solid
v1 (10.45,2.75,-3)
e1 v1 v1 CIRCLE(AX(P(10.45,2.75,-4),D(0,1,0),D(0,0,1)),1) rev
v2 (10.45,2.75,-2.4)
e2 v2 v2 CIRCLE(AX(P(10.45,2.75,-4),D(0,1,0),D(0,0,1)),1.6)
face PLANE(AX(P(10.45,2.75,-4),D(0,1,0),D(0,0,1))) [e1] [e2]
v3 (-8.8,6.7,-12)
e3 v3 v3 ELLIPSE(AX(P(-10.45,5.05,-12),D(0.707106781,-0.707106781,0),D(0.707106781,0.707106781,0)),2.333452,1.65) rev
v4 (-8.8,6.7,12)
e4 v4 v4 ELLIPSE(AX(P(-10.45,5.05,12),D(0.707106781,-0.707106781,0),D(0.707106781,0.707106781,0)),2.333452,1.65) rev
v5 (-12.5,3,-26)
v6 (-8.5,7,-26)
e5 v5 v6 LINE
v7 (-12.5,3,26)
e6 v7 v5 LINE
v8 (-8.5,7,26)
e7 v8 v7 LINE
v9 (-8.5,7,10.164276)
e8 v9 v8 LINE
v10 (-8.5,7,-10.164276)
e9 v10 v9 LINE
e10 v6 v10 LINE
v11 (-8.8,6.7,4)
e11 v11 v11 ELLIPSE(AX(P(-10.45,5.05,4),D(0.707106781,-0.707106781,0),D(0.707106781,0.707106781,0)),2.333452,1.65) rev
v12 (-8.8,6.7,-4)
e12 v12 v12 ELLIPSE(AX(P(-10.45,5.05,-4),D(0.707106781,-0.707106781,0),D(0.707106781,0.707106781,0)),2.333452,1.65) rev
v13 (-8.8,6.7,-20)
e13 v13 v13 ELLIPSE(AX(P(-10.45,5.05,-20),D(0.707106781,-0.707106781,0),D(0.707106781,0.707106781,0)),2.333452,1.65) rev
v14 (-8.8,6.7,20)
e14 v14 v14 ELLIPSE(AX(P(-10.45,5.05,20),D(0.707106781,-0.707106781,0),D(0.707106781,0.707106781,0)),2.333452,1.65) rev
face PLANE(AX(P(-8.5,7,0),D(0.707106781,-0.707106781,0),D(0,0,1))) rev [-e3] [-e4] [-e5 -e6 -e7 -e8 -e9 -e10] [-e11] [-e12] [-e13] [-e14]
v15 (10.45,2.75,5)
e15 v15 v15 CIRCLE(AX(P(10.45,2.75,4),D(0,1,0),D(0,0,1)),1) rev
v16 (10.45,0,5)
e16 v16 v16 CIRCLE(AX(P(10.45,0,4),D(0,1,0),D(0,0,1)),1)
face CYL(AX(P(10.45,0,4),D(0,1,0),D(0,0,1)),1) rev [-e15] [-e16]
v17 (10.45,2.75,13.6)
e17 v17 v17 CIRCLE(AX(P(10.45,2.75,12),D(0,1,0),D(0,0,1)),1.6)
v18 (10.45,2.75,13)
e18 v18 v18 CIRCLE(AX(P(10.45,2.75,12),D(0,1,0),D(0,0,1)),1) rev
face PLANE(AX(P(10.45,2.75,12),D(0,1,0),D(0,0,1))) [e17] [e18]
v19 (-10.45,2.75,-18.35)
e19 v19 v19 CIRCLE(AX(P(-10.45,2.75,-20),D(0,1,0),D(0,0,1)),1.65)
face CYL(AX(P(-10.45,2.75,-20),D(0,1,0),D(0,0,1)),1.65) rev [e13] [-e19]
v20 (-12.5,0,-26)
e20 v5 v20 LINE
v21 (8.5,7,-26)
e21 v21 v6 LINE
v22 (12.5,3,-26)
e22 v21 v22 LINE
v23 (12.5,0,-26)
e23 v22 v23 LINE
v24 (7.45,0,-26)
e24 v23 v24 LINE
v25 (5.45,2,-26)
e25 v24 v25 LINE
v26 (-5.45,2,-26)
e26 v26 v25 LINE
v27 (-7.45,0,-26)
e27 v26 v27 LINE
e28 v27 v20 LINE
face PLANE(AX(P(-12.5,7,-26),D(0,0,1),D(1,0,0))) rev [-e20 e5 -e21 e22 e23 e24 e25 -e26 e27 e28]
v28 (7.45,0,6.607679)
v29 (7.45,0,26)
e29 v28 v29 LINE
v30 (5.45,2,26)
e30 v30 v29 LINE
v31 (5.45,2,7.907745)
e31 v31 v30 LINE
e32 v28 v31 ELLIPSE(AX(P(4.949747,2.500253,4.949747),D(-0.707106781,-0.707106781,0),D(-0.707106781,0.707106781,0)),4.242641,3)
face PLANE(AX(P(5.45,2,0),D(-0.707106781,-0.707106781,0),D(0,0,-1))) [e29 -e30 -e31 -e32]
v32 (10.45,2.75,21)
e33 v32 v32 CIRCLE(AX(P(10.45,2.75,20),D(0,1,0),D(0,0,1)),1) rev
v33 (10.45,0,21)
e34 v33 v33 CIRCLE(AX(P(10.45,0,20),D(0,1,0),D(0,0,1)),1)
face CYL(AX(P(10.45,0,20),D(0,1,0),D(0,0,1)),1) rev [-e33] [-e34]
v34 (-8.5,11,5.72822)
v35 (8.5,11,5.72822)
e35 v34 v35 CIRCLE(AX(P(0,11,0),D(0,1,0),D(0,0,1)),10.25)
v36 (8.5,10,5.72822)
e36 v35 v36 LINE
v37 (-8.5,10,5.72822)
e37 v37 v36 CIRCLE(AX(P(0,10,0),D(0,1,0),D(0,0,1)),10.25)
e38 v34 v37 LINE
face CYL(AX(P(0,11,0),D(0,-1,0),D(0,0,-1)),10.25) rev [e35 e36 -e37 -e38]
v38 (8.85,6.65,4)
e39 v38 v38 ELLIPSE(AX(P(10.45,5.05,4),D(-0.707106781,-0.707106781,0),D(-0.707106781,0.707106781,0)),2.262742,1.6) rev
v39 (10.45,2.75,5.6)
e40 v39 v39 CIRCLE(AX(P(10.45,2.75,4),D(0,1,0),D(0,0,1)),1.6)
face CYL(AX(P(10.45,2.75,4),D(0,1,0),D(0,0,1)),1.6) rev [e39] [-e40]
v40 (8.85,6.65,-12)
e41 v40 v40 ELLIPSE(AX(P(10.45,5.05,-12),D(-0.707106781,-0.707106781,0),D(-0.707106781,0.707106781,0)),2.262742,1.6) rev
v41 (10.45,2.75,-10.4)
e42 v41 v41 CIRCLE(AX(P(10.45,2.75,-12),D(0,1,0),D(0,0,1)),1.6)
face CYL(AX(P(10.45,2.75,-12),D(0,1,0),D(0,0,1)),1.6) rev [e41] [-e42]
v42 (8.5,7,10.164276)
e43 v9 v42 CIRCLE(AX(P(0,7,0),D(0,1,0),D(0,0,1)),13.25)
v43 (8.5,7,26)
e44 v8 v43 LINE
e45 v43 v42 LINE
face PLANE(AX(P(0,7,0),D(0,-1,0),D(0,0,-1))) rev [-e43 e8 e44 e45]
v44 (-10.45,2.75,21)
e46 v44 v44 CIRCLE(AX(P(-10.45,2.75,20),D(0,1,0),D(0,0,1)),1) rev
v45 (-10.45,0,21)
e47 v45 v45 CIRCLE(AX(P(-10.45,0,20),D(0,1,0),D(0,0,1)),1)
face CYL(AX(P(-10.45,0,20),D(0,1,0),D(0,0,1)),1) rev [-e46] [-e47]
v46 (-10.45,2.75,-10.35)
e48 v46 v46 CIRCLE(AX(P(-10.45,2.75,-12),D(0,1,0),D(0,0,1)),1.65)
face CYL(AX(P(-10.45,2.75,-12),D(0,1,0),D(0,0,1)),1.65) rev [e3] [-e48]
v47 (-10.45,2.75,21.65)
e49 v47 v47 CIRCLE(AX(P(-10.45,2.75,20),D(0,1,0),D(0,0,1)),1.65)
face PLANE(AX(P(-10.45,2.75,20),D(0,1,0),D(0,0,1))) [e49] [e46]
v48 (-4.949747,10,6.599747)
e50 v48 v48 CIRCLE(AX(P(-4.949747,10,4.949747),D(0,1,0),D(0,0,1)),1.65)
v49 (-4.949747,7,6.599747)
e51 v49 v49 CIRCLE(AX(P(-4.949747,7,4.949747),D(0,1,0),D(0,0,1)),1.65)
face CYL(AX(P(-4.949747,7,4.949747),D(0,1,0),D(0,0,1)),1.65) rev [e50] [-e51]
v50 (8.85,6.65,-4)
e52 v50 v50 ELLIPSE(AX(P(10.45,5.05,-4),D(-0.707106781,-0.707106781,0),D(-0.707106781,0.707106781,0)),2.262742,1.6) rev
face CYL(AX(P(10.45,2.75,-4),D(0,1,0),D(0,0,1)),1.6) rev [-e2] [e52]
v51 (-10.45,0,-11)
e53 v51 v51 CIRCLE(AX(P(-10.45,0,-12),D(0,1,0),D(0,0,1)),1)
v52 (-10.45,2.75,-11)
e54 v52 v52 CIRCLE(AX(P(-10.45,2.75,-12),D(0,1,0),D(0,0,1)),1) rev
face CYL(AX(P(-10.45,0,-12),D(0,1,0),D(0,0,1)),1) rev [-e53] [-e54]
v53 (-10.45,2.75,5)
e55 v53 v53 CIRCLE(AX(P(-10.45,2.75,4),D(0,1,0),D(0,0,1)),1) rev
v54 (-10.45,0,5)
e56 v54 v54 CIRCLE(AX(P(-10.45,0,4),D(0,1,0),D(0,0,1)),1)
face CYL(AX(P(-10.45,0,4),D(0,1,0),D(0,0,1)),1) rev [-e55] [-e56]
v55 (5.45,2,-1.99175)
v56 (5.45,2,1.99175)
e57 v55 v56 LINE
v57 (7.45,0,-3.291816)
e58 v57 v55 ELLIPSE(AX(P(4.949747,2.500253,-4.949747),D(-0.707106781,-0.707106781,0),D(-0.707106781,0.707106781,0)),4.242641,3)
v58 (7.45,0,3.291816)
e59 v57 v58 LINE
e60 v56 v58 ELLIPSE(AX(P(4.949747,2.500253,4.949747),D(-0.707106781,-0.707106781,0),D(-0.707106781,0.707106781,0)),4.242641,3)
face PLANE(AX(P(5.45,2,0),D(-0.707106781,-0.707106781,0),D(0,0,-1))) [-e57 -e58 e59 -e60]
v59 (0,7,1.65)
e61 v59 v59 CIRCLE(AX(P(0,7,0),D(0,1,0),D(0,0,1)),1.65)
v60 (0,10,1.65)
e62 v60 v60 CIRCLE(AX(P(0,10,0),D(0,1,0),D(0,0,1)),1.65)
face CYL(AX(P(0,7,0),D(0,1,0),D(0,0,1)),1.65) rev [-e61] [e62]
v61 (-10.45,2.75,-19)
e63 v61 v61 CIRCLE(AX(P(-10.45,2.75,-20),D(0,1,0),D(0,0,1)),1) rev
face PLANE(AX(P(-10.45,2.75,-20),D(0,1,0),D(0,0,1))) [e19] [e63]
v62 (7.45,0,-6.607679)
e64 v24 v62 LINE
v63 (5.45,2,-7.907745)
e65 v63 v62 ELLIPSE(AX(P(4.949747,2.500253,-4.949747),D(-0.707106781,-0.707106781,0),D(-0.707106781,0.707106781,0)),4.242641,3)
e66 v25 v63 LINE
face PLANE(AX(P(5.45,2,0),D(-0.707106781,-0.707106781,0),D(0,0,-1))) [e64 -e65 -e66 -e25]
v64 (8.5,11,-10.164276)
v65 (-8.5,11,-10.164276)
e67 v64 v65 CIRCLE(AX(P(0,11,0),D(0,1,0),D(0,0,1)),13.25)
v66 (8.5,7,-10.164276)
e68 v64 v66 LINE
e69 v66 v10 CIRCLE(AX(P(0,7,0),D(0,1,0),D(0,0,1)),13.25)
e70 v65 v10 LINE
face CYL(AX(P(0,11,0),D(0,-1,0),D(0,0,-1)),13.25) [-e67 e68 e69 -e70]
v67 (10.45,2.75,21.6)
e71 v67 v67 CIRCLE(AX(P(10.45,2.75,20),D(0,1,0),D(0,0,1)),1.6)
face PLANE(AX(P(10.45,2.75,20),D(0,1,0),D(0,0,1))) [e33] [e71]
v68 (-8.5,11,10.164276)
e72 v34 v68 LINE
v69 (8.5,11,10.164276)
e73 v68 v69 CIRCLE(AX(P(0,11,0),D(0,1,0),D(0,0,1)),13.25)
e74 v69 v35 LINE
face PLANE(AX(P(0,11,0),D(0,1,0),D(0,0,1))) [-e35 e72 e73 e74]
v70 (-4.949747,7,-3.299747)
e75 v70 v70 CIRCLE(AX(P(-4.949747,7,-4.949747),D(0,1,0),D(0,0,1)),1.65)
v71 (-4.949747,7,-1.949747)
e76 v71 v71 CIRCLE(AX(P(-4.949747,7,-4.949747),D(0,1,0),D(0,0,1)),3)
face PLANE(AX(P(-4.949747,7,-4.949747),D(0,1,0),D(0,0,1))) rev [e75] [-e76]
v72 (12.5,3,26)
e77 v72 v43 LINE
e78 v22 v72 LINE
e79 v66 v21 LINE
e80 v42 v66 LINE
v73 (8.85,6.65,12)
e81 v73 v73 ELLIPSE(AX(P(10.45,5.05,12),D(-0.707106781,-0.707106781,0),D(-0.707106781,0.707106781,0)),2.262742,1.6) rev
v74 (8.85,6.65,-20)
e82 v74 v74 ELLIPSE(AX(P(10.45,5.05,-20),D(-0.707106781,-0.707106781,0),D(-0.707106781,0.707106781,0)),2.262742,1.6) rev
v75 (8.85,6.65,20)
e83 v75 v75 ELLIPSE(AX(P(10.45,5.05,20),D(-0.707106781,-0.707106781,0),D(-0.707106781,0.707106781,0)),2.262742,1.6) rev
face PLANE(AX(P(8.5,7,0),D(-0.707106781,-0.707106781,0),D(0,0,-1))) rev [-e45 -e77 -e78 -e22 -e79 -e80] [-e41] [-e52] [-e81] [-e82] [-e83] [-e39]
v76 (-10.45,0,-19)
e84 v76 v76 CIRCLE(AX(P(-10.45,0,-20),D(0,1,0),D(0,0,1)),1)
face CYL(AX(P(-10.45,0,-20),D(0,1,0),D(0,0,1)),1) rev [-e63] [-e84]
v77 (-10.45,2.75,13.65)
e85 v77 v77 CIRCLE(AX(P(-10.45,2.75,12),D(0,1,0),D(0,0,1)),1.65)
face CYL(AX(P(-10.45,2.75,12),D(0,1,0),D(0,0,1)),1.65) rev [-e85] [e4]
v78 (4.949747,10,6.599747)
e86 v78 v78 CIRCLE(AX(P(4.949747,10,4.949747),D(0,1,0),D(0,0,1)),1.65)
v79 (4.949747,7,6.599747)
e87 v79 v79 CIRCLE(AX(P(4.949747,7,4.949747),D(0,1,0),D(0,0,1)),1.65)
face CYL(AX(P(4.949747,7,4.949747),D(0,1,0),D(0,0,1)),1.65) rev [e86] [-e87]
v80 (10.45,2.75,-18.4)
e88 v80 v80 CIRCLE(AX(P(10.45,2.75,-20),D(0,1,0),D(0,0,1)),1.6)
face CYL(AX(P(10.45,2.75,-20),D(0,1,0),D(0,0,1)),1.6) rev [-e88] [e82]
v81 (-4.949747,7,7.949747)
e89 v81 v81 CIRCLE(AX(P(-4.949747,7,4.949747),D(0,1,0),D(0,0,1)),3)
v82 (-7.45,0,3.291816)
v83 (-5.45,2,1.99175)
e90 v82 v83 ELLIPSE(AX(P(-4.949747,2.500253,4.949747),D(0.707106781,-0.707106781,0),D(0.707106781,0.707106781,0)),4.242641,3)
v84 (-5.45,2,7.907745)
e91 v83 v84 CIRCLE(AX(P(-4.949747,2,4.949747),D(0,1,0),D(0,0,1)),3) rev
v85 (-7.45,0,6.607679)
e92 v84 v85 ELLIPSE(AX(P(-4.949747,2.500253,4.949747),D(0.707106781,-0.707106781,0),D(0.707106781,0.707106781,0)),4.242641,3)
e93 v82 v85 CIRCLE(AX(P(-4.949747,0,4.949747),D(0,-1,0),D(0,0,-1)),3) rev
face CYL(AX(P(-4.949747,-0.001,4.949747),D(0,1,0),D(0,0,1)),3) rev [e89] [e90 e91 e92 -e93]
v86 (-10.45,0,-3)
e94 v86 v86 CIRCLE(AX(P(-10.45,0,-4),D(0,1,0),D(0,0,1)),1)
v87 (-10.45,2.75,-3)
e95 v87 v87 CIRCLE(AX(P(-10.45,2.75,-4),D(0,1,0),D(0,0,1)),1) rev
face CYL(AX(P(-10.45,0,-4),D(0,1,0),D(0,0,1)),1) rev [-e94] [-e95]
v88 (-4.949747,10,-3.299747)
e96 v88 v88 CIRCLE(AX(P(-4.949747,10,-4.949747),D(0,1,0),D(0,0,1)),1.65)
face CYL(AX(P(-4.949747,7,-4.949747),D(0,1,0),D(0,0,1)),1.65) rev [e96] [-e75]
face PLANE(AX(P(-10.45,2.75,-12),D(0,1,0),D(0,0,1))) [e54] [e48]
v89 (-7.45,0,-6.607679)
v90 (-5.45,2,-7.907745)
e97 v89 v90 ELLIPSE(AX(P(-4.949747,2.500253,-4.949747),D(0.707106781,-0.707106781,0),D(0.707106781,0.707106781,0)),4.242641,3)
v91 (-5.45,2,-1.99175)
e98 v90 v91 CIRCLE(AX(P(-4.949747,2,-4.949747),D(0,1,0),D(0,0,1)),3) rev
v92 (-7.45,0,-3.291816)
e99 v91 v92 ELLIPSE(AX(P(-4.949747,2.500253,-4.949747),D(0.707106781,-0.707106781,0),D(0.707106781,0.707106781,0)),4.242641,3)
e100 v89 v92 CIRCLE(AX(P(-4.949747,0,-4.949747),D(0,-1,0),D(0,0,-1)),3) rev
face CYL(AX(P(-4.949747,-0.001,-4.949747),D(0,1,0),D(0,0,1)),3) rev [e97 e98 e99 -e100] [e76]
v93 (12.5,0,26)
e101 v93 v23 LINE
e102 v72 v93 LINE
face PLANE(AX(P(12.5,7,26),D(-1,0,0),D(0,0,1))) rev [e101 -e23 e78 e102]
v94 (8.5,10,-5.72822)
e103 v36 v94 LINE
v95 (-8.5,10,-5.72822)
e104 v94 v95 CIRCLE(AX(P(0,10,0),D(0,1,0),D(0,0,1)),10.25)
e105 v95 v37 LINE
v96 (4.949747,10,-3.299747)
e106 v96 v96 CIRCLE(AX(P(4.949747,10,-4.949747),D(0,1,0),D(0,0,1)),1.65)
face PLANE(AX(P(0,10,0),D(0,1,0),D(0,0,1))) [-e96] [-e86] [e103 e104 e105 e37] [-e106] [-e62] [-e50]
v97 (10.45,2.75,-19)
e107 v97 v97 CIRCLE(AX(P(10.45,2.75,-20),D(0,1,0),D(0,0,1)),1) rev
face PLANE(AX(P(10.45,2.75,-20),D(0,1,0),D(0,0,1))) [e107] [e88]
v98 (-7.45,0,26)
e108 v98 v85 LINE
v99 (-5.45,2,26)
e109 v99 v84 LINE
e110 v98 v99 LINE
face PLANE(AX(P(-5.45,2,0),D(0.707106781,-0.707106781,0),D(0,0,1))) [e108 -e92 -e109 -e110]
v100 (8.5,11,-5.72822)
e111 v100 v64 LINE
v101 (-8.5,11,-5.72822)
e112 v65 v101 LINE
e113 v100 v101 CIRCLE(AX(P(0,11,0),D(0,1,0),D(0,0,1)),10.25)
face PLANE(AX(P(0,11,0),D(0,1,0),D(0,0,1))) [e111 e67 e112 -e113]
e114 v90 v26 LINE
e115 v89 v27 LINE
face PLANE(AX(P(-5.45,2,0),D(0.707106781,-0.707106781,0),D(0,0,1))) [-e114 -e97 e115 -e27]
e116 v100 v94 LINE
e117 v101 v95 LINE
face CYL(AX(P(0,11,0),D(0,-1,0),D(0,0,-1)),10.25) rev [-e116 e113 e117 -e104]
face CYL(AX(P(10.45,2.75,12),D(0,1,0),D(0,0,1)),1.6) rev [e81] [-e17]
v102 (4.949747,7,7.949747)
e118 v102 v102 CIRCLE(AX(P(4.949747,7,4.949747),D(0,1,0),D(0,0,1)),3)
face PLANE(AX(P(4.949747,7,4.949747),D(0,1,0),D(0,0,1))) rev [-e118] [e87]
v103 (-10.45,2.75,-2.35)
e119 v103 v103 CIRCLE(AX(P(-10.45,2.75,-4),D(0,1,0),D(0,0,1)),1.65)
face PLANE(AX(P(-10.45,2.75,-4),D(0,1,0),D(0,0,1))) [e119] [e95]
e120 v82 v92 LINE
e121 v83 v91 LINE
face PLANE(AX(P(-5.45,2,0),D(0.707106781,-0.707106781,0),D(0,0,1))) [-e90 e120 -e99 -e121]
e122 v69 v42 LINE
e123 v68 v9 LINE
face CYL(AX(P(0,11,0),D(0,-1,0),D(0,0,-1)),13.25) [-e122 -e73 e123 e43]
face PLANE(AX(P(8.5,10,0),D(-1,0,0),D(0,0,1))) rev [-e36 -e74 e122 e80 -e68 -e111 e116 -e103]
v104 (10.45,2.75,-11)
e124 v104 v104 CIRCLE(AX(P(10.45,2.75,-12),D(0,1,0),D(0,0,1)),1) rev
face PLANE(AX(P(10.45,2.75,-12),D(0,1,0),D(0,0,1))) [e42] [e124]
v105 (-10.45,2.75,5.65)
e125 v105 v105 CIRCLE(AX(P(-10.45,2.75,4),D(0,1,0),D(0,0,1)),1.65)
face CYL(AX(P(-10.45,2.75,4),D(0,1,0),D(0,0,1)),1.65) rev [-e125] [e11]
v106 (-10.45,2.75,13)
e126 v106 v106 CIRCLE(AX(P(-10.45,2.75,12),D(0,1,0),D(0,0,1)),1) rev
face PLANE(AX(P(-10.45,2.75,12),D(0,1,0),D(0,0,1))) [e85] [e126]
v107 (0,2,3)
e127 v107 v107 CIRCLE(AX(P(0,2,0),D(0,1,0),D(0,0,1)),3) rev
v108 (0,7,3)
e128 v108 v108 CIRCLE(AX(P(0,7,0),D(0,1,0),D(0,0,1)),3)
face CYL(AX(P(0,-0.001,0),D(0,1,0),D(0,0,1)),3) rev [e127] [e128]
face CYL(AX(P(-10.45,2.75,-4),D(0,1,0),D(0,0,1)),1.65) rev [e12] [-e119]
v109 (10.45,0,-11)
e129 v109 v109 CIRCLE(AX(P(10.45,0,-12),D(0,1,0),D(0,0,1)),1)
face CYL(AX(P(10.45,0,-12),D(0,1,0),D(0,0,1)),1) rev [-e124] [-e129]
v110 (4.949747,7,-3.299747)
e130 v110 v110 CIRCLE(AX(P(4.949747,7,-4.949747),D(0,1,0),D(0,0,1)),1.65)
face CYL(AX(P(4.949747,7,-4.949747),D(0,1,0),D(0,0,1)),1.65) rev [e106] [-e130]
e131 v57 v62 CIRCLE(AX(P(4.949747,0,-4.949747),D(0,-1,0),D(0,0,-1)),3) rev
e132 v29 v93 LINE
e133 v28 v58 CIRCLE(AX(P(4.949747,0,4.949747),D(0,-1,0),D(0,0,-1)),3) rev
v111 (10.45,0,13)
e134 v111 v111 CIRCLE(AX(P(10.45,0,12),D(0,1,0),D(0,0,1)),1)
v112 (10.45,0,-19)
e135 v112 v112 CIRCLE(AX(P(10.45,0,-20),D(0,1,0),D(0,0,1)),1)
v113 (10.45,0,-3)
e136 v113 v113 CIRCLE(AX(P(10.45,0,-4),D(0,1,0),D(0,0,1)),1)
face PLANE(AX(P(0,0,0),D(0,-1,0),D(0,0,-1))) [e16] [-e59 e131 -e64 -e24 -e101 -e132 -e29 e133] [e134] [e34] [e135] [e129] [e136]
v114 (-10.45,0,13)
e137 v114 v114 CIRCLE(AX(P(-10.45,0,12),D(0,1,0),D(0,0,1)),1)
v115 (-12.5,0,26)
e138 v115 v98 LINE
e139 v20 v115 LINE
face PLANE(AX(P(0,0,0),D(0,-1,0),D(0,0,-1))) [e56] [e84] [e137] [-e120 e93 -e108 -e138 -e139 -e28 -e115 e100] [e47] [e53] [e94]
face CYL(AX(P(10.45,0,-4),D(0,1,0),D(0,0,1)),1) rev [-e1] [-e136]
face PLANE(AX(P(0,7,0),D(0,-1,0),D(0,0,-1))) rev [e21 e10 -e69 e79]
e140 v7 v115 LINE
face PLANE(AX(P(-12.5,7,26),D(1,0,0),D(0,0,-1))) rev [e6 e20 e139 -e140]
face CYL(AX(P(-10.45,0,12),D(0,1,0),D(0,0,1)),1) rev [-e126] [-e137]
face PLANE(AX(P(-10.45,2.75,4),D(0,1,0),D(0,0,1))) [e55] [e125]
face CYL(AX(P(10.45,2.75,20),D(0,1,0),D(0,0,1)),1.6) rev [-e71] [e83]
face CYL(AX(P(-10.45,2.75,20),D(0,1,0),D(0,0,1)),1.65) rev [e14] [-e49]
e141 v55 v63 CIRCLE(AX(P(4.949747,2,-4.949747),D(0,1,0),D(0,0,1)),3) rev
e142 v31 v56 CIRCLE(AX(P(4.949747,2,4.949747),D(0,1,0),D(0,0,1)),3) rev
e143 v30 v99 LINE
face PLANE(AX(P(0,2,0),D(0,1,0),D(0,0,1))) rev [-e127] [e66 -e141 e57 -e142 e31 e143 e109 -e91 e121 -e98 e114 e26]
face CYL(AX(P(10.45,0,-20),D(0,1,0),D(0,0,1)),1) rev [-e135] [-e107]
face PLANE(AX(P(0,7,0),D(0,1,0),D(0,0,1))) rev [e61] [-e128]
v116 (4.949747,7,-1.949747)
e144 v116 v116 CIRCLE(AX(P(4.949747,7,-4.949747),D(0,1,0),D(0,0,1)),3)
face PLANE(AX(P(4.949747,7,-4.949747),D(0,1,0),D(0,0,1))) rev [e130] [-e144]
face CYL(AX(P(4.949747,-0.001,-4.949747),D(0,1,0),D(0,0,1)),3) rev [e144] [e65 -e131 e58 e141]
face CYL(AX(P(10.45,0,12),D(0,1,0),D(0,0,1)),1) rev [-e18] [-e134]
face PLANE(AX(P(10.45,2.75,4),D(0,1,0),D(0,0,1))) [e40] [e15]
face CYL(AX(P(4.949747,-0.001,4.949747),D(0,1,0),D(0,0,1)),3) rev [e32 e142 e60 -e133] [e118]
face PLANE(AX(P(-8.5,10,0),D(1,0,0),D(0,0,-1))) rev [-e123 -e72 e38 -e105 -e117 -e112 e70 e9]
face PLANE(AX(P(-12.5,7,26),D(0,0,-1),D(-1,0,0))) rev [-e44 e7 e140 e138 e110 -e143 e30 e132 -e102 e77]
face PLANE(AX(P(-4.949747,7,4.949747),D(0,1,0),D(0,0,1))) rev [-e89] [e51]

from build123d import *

# Parameters (mm, degrees)
SKETCH1_W           = 25
SKETCH1_H           = 52
BOSS_EXTRUDE1_DEPTH = 7
SKETCH2_R           = 1
CUT_EXTRUDE1_DEPTH  = 30.685855218
LPATTERN1_COUNT     = 6
LPATTERN1_PITCH     = 8
SKETCH9_R           = 1.65
SKETCH9_R_2         = 1.6
CUT_EXTRUDE3_DEPTH  = 4.25
LPATTERN2_COUNT     = 6
LPATTERN2_PITCH     = 8
CHAMFER2_SIZE       = 4
SKETCH10_W          = 14.9
SKETCH10_H          = 52
CUT_EXTRUDE4_DEPTH  = 2
CHAMFER3_SIZE       = 2
BOSS_EXTRUDE2_DEPTH = 3
BOSS_EXTRUDE3_DEPTH = 4
SKETCH13_R          = 1.65
CUT_EXTRUDE5_DEPTH  = 3
CUT_EXTRUDE6_REACH  = 31.686
SKETCH14_R          = 3


# Some blends are built 0.0001 mm under size
with BuildPart() as part:
    # Sketch1 → Boss-Extrude1 (new body)
    with BuildSketch(Plane(origin=(0, 0, 0), x_dir=(1, 0, 0), z_dir=(0, 1, 0))):
        Rectangle(SKETCH1_W, SKETCH1_H)
    extrude(amount=BOSS_EXTRUDE1_DEPTH)

    # Sketch2 → Cut-Extrude1 (cut, through all)
    with BuildSketch(Plane(origin=(0, 7, 0), x_dir=(1, 0, 0), z_dir=(0, 1, 0))):
        with Locations(Location((-10.45, -20, 0), (0, 0, 270))):
            Circle(SKETCH2_R)
        with Locations(Location((10.45, -20, 0), (0, 0, 270))):
            Circle(SKETCH2_R)
    cut_extrude1 = extrude(amount=-CUT_EXTRUDE1_DEPTH, mode=Mode.SUBTRACT)

    # LPattern1: Cut-Extrude1 ×6
    with Locations(*[(0, 0, -i * LPATTERN1_PITCH) for i in range(1, LPATTERN1_COUNT)]):
        add(cut_extrude1, mode=Mode.SUBTRACT)

    # Sketch9 → Cut-Extrude3 (cut)
    with BuildSketch(Plane(origin=(0, 7, 0), x_dir=(1, 0, 0), z_dir=(0, 1, 0))):
        with Locations(Location((-10.45, 20, 0), (0, 0, 270))):
            Circle(SKETCH9_R)
        with Locations(Location((10.45, 20, 0), (0, 0, 270))):
            Circle(SKETCH9_R_2)
    cut_extrude3 = extrude(amount=-CUT_EXTRUDE3_DEPTH, mode=Mode.SUBTRACT)

    # LPattern2: Cut-Extrude3 ×6
    with Locations(*[(0, 0, i * LPATTERN2_PITCH) for i in range(1, LPATTERN2_COUNT)]):
        add(cut_extrude3, mode=Mode.SUBTRACT)

    # Chamfer2
    # the kernel refuses this chamfer: 4 mm, written as the material it takes off along each edge
    with BuildSketch(Plane(origin=(-12.5, 7, -36.286731952), x_dir=(-0.027495876610586487, -0.9996219169112968, 0), z_dir=(0, 0, 1)), Plane(origin=(12.5, 7, 36.286731952), x_dir=(0.027495876610586487, -0.9996219169112968, 0), z_dir=(0, 0, -1))) as chamfer2_piece_1:
        Polygon((CHAMFER2_SIZE * 0.999621916911, CHAMFER2_SIZE * 0.0274958766106), (-CHAMFER2_SIZE * 0.0274958766106, CHAMFER2_SIZE * 0.999621916911), (0, 0), align=None)
    extrude(amount=72.573463904, mode=Mode.SUBTRACT)

    # Sketch10 → Cut-Extrude4 (cut)
    with BuildSketch(Plane.XZ):
        Rectangle(SKETCH10_W, SKETCH10_H)
    extrude(amount=-CUT_EXTRUDE4_DEPTH, mode=Mode.SUBTRACT)

    # Chamfer3
    chamfer3_edges = [part.edges().sort_by_distance(p)[0] for p in [
        (7.45, 2, 0),
        (-7.45, 2, 0),
    ]]
    chamfer(chamfer3_edges, length=CHAMFER3_SIZE - 0.0001)  # a hair under: the kernel refuses the full size

    # Sketch12 → Boss-Extrude2 (add)
    with BuildSketch(Plane(origin=(0, 7, 0), x_dir=(1, 0, 0), z_dir=(0, 1, 0))):
        with BuildLine():
            ThreePointArc((8.5, 5.728219619), (0, 10.25), (-8.5, 5.728219619))
            Line((-8.5, 5.728219619), (-8.5, -5.728219619))
            ThreePointArc((-8.5, -5.728219619), (0, -10.25), (8.5, -5.728219619))
            Line((8.5, -5.728219619), (8.5, 5.728219619))
        make_face()
    extrude(amount=BOSS_EXTRUDE2_DEPTH)

    # Sketch12<3> → Boss-Extrude3 (add)
    with BuildSketch(Plane(origin=(0, 7, 0), x_dir=(1, 0, 0), z_dir=(0, 1, 0))):
        with BuildLine():
            ThreePointArc((8.5, 10.164275675), (0, 13.25), (-8.5, 10.164275675))
            Line((-8.5, 10.164275675), (-8.5, 5.728219619))
            ThreePointArc((-8.5, 5.728219619), (0, 10.25), (8.5, 5.728219619))
            Line((8.5, 5.728219619), (8.5, 10.164275675))
        make_face()
        with BuildLine():
            Line((-8.5, -5.728219619), (-8.5, -10.164275675))
            ThreePointArc((-8.5, -10.164275675), (0, -13.25), (8.5, -10.164275675))
            Line((8.5, -10.164275675), (8.5, -5.728219619))
            ThreePointArc((8.5, -5.728219619), (0, -10.25), (-8.5, -5.728219619))
        make_face()
    extrude(amount=BOSS_EXTRUDE3_DEPTH)

    # Sketch13 → Cut-Extrude5 (cut)
    with BuildSketch(Plane(origin=(0, 10, 0), x_dir=(1, 0, 0), z_dir=(0, 1, 0))):
        with Locations(Location((-4.949747468, 4.949747468, 0), (0, 0, 270))):
            Circle(SKETCH13_R)
        with Locations(Location((4.949747468, 4.949747468, 0), (0, 0, 270))):
            Circle(SKETCH13_R)
        with Locations(Location((4.949747468, -4.949747468, 0), (0, 0, 270))):
            Circle(SKETCH13_R)
        with Locations(Location((-4.949747468, -4.949747468, 0), (0, 0, 270))):
            Circle(SKETCH13_R)
        with Locations(Location((0, 0, 0), (0, 0, 270))):
            Circle(SKETCH13_R)
    extrude(amount=-CUT_EXTRUDE5_DEPTH, mode=Mode.SUBTRACT)

    # Sketch14 → Cut-Extrude6 (cut, up to next)
    with BuildSketch(Plane(origin=(0, 7, 0), x_dir=(1, 0, 0), z_dir=(0, 1, 0)), mode=Mode.PRIVATE) as cut_extrude6_sk1:
        with Locations(Location((-4.949747468, 4.949747468, 0), (0, 0, 270))):
            Circle(SKETCH14_R)
    cut_extrude6_tool1 = extrude(cut_extrude6_sk1.sketch, amount=-CUT_EXTRUDE6_REACH, mode=Mode.PRIVATE) & part.part
    # Sketch14 → Cut-Extrude6 (cut, up to next)
    with BuildSketch(Plane(origin=(0, 7, 0), x_dir=(1, 0, 0), z_dir=(0, 1, 0)), mode=Mode.PRIVATE) as cut_extrude6_sk2:
        with Locations(Location((4.949747468, 4.949747468, 0), (0, 0, 270))):
            Circle(SKETCH14_R)
    cut_extrude6_tool2 = extrude(cut_extrude6_sk2.sketch, amount=-CUT_EXTRUDE6_REACH, mode=Mode.PRIVATE) & part.part
    # Sketch14 → Cut-Extrude6 (cut, up to next)
    with BuildSketch(Plane(origin=(0, 7, 0), x_dir=(1, 0, 0), z_dir=(0, 1, 0)), mode=Mode.PRIVATE) as cut_extrude6_sk3:
        with Locations(Location((4.949747468, -4.949747468, 0), (0, 0, 270))):
            Circle(SKETCH14_R)
    cut_extrude6_tool3 = extrude(cut_extrude6_sk3.sketch, amount=-CUT_EXTRUDE6_REACH, mode=Mode.PRIVATE) & part.part
    # Sketch14 → Cut-Extrude6 (cut, up to next)
    with BuildSketch(Plane(origin=(0, 7, 0), x_dir=(1, 0, 0), z_dir=(0, 1, 0)), mode=Mode.PRIVATE) as cut_extrude6_sk4:
        with Locations(Location((-4.949747468, -4.949747468, 0), (0, 0, 270))):
            Circle(SKETCH14_R)
    cut_extrude6_tool4 = extrude(cut_extrude6_sk4.sketch, amount=-CUT_EXTRUDE6_REACH, mode=Mode.PRIVATE) & part.part
    # Sketch14 → Cut-Extrude6 (cut, up to next)
    with BuildSketch(Plane(origin=(0, 7, 0), x_dir=(1, 0, 0), z_dir=(0, 1, 0)), mode=Mode.PRIVATE) as cut_extrude6_sk5:
        with Locations(Location((0, 0, 0), (0, 0, 270))):
            Circle(SKETCH14_R)
    cut_extrude6_tool5 = extrude(cut_extrude6_sk5.sketch, amount=-CUT_EXTRUDE6_REACH, mode=Mode.PRIVATE) & part.part
    add(cut_extrude6_tool1.solids().sort_by_distance((-4.949747, 7, -4.949747))[0], mode=Mode.SUBTRACT)
    add(cut_extrude6_tool2.solids().sort_by_distance((4.949747, 7, -4.949747))[0], mode=Mode.SUBTRACT)
    add(cut_extrude6_tool3.solids().sort_by_distance((4.949747, 7, 4.949747))[0], mode=Mode.SUBTRACT)
    add(cut_extrude6_tool4.solids().sort_by_distance((-4.949747, 7, 4.949747))[0], mode=Mode.SUBTRACT)
    add(cut_extrude6_tool5.solids().sort_by_distance((0, 7, 0))[0], mode=Mode.SUBTRACT)


solid = part.part
